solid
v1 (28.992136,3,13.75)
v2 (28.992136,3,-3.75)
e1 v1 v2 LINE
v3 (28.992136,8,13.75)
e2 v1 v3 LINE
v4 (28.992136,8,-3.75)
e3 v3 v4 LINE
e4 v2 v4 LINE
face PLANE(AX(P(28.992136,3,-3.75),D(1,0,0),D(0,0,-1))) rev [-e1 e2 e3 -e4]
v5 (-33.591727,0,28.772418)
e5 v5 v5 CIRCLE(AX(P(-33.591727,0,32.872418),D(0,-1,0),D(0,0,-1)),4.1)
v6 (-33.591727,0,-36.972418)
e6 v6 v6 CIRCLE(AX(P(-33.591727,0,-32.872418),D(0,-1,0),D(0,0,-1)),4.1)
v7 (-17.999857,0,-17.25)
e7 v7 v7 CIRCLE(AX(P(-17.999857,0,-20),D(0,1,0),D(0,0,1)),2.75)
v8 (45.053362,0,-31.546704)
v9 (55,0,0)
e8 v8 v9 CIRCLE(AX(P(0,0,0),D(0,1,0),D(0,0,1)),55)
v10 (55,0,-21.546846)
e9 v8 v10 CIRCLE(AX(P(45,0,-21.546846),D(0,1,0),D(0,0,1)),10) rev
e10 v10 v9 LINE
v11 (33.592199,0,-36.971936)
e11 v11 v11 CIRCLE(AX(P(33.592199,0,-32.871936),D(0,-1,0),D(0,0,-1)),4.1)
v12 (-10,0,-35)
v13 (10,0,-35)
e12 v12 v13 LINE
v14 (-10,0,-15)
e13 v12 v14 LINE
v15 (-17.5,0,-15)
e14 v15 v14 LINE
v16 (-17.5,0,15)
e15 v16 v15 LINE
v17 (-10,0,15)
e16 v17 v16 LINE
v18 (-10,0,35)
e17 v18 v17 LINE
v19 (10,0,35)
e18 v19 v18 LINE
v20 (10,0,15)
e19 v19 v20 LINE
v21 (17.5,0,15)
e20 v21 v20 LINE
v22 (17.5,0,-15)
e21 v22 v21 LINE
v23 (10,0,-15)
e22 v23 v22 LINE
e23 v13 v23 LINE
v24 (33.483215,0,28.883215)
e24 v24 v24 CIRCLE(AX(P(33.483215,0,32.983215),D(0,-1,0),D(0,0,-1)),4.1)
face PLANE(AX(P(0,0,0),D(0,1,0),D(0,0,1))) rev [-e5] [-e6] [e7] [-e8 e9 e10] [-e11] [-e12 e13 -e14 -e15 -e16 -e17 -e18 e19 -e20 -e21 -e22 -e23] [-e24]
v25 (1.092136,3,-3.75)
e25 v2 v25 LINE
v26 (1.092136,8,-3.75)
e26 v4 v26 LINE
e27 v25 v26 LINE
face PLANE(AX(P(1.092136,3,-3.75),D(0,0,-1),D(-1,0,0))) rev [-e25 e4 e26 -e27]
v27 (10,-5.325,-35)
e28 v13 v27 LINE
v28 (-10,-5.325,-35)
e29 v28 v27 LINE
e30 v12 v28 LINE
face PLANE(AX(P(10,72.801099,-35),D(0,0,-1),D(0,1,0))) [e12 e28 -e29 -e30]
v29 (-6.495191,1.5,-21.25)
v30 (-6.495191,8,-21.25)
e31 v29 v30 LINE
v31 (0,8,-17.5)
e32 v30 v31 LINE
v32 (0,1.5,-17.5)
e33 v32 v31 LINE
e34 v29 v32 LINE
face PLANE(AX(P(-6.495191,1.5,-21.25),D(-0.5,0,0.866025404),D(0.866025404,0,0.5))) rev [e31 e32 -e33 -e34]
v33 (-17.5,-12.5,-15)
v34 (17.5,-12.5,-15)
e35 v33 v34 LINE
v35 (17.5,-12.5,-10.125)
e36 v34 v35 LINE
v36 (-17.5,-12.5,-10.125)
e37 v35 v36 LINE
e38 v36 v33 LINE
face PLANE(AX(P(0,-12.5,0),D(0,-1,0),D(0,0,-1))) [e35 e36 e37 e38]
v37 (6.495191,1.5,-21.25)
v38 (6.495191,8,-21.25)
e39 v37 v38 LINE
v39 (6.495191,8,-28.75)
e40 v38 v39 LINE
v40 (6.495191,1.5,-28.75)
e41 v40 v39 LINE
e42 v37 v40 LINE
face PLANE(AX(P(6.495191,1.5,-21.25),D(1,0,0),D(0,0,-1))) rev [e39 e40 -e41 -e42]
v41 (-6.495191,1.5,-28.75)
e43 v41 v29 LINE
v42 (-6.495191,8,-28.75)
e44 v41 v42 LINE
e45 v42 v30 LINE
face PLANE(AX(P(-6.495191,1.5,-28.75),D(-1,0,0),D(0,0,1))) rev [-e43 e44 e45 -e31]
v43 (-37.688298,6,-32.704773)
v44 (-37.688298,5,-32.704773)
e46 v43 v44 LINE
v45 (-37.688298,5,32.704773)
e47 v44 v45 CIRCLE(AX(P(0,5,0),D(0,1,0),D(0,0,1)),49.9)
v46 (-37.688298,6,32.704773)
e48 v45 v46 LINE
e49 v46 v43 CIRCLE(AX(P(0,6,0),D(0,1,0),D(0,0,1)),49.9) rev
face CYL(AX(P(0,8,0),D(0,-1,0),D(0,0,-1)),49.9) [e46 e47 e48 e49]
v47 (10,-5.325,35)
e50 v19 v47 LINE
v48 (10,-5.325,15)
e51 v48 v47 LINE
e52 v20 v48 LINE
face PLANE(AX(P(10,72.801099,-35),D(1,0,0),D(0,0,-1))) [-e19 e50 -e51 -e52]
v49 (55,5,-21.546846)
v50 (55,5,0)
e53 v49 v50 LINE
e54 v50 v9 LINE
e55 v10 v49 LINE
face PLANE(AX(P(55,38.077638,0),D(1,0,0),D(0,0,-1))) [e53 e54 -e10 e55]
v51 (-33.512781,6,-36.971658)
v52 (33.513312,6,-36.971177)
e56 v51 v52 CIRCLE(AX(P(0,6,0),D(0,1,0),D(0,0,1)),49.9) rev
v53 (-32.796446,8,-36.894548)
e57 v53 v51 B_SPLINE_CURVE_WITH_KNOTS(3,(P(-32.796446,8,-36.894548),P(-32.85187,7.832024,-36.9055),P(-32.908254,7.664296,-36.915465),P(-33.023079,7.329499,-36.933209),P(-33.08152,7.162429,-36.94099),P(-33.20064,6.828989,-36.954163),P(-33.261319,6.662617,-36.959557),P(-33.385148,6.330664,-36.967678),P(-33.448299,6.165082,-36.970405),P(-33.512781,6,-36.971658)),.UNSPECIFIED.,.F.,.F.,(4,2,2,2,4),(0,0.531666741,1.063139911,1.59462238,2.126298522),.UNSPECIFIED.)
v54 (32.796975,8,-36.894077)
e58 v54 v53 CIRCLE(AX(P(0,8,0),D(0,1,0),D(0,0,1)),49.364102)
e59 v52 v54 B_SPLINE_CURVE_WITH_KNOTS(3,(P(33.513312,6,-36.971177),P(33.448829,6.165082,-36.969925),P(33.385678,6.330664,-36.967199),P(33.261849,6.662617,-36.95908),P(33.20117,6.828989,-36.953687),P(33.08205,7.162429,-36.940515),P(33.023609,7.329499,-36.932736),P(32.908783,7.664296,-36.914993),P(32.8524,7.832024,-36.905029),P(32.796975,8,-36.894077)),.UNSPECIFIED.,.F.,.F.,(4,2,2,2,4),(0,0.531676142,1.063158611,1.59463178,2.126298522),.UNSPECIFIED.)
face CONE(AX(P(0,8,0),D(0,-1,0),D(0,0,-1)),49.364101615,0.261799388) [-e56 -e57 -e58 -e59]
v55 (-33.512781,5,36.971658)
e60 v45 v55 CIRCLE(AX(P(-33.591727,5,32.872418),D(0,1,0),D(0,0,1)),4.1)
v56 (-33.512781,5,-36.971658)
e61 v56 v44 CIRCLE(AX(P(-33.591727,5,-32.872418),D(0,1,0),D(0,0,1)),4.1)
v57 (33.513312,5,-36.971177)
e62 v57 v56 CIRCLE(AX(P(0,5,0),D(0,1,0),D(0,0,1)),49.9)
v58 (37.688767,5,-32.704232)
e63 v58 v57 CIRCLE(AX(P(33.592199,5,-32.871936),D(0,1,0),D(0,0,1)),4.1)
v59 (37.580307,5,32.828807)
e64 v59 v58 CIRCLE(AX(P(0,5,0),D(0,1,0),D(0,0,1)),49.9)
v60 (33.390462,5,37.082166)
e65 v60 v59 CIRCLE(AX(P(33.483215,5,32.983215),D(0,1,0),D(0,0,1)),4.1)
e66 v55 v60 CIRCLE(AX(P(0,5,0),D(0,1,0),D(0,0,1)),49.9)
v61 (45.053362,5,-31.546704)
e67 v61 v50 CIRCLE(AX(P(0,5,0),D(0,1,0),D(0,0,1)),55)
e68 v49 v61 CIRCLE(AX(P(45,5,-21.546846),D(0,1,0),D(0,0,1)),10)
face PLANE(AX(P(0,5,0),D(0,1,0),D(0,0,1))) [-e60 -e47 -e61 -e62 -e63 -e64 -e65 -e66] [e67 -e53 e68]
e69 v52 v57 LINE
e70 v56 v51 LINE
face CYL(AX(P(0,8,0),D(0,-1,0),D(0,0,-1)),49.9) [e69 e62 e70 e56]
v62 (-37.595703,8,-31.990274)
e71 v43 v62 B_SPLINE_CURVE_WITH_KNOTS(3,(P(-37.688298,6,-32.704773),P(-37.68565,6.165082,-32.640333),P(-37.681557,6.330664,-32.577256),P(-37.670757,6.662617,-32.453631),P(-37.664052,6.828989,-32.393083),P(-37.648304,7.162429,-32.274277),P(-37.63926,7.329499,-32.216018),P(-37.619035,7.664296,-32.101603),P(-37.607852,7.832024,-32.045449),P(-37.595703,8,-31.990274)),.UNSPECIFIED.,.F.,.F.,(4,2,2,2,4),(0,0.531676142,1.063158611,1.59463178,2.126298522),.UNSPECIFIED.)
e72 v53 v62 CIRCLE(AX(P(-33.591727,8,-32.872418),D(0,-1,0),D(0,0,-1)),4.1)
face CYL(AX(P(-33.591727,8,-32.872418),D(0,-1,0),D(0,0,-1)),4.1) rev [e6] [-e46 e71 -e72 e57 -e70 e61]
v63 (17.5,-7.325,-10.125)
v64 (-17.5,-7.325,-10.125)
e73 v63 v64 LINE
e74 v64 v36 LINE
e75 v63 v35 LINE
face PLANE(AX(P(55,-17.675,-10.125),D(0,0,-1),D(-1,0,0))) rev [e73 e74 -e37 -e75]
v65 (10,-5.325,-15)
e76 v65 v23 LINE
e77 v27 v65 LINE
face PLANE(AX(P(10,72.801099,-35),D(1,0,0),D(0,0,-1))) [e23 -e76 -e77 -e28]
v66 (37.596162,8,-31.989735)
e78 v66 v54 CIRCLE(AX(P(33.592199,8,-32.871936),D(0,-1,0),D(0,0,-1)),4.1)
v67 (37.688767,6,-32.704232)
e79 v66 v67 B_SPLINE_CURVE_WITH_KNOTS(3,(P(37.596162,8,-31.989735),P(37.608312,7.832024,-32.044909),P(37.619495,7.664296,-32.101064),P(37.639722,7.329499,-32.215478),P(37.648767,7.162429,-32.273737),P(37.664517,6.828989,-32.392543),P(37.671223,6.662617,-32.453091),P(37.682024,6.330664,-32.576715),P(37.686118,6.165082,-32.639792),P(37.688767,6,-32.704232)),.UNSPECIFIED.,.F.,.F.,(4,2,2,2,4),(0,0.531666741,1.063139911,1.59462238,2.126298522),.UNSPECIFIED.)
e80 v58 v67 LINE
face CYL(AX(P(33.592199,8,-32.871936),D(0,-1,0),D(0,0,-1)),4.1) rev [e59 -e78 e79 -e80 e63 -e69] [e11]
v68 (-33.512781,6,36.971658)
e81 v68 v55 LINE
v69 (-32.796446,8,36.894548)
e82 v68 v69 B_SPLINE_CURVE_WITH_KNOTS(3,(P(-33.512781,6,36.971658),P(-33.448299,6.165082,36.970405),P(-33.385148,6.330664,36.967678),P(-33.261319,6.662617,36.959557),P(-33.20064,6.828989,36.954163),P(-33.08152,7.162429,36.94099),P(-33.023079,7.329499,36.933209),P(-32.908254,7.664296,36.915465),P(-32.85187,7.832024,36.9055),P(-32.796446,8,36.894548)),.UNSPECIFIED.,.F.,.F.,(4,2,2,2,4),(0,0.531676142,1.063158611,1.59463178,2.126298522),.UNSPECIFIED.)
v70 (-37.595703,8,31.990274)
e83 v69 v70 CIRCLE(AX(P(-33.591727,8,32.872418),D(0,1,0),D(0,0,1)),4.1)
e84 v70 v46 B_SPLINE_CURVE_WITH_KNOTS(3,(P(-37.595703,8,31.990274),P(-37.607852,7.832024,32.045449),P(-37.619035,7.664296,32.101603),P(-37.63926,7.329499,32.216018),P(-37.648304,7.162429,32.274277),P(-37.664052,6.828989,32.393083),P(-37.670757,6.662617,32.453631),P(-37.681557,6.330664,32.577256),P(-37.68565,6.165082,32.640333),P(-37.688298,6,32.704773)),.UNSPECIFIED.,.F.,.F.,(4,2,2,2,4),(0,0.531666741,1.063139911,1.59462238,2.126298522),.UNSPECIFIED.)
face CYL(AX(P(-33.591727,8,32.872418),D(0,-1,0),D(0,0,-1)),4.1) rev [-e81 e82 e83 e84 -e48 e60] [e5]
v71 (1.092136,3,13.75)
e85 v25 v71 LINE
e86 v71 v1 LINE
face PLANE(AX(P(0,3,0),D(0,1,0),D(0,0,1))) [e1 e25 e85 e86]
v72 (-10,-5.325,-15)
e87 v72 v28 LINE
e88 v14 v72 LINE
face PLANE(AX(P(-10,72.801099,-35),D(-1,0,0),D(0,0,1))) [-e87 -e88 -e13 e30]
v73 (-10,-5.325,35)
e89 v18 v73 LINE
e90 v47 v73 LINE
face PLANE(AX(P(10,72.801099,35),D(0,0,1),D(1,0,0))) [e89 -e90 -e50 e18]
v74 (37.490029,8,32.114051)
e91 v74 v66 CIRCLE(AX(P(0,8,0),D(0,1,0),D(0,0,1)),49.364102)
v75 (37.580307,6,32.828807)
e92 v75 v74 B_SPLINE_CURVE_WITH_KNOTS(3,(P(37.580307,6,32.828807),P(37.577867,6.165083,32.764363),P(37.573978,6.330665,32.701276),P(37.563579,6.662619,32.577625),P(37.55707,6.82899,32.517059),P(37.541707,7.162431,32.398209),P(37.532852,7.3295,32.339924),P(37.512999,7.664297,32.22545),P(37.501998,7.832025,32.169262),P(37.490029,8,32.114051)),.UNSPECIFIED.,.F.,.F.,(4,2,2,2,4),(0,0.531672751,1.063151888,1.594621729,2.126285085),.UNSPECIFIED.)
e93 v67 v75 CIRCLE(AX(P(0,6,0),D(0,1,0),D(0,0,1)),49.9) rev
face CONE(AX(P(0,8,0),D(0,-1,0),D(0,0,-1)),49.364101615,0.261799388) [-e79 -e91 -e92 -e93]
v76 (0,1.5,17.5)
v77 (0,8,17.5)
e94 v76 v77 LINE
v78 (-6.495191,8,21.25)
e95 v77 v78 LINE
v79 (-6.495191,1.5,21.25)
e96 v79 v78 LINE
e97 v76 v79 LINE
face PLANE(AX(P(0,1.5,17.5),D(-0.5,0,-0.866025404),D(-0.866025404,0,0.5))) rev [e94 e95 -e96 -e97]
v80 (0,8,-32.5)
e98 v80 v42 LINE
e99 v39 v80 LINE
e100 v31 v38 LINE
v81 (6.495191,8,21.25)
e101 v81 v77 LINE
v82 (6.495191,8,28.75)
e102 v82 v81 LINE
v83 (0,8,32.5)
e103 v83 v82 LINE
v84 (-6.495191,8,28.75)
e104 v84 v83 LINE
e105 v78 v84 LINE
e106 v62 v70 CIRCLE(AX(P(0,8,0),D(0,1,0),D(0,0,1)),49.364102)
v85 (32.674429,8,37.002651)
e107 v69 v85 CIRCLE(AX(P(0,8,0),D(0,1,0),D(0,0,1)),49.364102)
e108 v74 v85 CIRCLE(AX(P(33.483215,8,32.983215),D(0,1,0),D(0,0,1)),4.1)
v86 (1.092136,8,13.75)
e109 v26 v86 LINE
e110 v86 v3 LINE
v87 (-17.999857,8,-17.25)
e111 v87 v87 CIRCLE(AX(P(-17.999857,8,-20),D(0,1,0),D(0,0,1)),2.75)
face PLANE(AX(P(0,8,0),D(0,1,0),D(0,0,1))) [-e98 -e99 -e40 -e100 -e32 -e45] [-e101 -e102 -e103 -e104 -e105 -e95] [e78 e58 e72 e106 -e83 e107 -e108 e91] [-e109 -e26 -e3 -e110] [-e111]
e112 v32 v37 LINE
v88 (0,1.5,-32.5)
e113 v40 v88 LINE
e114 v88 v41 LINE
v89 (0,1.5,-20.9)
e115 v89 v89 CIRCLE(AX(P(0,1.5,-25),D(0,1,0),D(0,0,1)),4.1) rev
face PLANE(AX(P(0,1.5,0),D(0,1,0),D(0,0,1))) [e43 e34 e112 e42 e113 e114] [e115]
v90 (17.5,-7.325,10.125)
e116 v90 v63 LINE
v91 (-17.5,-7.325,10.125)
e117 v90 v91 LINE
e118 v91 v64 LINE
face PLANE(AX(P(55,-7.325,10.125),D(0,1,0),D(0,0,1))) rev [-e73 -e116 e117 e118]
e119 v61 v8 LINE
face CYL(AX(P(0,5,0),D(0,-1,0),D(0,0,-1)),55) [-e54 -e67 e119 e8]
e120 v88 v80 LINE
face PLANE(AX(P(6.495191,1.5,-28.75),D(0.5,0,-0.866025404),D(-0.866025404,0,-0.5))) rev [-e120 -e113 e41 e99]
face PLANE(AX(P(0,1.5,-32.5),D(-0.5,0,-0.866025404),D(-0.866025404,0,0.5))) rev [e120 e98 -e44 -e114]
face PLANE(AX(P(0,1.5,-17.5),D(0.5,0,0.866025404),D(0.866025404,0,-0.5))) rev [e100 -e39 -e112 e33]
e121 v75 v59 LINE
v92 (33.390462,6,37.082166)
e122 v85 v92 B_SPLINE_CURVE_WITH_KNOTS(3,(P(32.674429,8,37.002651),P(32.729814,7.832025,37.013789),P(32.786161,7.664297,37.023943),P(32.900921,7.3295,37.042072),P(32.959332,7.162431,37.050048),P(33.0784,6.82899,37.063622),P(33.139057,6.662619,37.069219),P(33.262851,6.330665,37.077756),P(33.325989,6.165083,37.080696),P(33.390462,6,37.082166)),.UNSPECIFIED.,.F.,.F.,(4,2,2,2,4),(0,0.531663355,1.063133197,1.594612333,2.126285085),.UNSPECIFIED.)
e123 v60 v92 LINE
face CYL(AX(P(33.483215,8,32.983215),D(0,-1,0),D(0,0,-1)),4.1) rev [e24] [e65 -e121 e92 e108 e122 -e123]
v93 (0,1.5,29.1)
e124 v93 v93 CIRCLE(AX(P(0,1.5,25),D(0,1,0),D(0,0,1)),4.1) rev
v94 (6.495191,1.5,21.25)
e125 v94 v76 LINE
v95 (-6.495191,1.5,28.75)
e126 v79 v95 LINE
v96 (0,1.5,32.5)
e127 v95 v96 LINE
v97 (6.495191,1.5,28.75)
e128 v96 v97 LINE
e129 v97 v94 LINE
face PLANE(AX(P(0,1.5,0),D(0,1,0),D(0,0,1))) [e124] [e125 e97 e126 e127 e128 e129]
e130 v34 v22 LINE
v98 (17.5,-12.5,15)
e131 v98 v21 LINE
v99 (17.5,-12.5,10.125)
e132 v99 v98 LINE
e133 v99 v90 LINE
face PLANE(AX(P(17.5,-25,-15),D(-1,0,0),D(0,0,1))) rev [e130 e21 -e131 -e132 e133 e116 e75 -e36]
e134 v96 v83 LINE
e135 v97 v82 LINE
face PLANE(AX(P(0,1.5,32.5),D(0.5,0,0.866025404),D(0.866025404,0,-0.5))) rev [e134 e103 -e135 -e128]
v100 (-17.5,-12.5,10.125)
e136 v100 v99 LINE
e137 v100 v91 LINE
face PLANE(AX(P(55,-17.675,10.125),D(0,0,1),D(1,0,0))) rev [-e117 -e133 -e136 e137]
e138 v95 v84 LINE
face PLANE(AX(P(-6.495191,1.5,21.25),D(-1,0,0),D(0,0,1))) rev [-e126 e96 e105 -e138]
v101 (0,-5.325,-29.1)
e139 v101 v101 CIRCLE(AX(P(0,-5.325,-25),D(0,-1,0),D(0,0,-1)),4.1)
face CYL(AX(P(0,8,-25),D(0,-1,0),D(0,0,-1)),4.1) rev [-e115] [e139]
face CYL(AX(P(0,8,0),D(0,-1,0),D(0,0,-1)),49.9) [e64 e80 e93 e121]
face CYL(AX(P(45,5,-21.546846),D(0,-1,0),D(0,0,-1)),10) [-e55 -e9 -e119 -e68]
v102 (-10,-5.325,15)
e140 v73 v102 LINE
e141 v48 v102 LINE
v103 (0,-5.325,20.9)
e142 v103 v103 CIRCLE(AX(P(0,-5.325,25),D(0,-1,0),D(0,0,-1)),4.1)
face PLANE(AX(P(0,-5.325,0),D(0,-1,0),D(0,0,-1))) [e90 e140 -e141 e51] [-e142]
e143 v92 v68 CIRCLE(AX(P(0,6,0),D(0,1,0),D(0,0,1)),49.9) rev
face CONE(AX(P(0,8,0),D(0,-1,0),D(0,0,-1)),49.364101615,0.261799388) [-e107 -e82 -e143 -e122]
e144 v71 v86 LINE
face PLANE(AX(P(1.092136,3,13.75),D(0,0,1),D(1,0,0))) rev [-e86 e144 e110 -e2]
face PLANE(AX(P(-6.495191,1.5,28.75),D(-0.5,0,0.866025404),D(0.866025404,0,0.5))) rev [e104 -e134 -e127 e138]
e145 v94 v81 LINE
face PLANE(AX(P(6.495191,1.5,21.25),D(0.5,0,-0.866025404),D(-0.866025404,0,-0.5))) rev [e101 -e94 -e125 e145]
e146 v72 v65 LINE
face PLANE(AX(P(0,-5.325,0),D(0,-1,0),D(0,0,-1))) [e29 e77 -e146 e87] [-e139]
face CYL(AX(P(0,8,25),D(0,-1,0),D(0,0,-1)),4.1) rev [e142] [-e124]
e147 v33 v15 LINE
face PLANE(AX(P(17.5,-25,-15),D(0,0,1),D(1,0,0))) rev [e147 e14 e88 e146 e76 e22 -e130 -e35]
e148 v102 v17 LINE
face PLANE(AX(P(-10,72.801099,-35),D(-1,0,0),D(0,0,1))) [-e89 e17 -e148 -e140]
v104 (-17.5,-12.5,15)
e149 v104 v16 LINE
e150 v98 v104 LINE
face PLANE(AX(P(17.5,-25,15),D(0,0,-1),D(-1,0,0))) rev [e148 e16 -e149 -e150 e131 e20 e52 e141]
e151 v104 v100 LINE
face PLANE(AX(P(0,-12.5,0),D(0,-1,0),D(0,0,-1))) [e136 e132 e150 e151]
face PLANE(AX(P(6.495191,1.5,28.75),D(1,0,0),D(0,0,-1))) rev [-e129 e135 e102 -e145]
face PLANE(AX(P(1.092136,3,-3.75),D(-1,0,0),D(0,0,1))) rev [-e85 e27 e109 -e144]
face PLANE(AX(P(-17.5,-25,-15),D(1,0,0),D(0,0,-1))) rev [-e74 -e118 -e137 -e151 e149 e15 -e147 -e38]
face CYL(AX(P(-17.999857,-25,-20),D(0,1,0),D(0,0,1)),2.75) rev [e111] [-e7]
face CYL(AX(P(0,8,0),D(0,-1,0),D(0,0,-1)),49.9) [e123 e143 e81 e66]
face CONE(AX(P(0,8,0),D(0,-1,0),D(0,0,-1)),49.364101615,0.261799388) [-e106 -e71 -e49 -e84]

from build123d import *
from OCP.BRepFilletAPI import BRepFilletAPI_MakeChamfer

# Parameters (mm, degrees)
SKETCH_1_R          = 55
EXTRUDE_1_DEPTH     = 5
SKETCH_2_R          = 49.9
EXTRUDE_2_DEPTH     = 3
SKETCH_3_W          = 35
SKETCH_3_H          = 30
EXTRUDE_3_DEPTH     = 25
SKETCH_5_R          = 4.1
CUT_EXTRUDE_2_DEPTH = 82.700673192
SKETCH_6_R          = 2.75
CUT_EXTRUDE_3_DEPTH = 85.492603227
BOSS_EXTRUDE1_DEPTH = 5
FILLET1_R           = 10
SKETCH2_W           = 20.25
SKETCH2_H           = 10.35
CUT_EXTRUDE1_DEPTH  = 95.372930441
SKETCH3_W           = 27.9
SKETCH3_H           = 17.5
CUT_EXTRUDE2_DEPTH  = 5
CHAMFER1_SIZE       = 2
CHAMFER1_SIZE2      = 0.535898385
SKETCH4_W           = 35
SKETCH4_H           = 30
CUT_EXTRUDE3_DEPTH  = 12.5
BOSS_EXTRUDE2_START = -2
SKETCH5_W           = 20
SKETCH5_H           = 70
BOSS_EXTRUDE2_DEPTH = 5.325
SKETCH6_R           = 4.1
CUT_EXTRUDE4_DEPTH  = 79.914863161
CUT_EXTRUDE5_DEPTH  = 6.5


with BuildPart() as part:
    # Эскиз1 → Бобышка-Вытянуть1 (new body)
    with BuildSketch(Plane(origin=(0, 0, 0), x_dir=(1, 0, 0), z_dir=(0, 1, 0))):
        with Locations(Location((0, 0, 0), (0, 0, 270))):
            Circle(SKETCH_1_R)
    extrude(amount=EXTRUDE_1_DEPTH)

    # Эскиз2 → Бобышка-Вытянуть2 (add)
    with BuildSketch(Plane(origin=(0, 5, 0), x_dir=(1, 0, 0), z_dir=(0, 1, 0))):
        with Locations(Location((0, 0, 0), (0, 0, 270))):
            Circle(SKETCH_2_R)
    extrude(amount=EXTRUDE_2_DEPTH)

    # Эскиз3 → Бобышка-Вытянуть3 (add)
    with BuildSketch(Plane.XZ):
        Rectangle(SKETCH_3_W, SKETCH_3_H)
    extrude(amount=EXTRUDE_3_DEPTH)

    # Эскиз5 → Вырез-Вытянуть2 (cut, through all)
    with BuildSketch(Plane.XZ):
        with Locations(Location((33.592198598, -32.871936263, 0), (0, 0, 270))):
            Circle(SKETCH_5_R)
        with Locations(Location((-33.591727056, -32.872418125, 0), (0, 0, 270))):
            Circle(SKETCH_5_R)
        with Locations(Location((-33.591727056, 32.872418125, 0), (0, 0, 270))):
            Circle(SKETCH_5_R)
        with Locations(Location((33.483215177, 32.983215177, 0), (0, 0, 270))):
            Circle(SKETCH_5_R)
    extrude(amount=-CUT_EXTRUDE_2_DEPTH, mode=Mode.SUBTRACT)

    # Эскиз6 → Вырез-Вытянуть3 (cut, through all)
    with BuildSketch(Plane(origin=(0, 8, 0), x_dir=(1, 0, 0), z_dir=(0, 1, 0))):
        with Locations(Location((-17.999856554, 19.999999999, 0), (0, 0, 270))):
            Circle(SKETCH_6_R)
    extrude(amount=-CUT_EXTRUDE_3_DEPTH, mode=Mode.SUBTRACT)

    # Sketch1 → Boss-Extrude1 (add)
    with BuildSketch(Plane.XZ):
        with BuildLine():
            Line((55, 0), (55, -31.546703999))
            Line((55, -31.546703999), (45.053362436, -31.546703999))
            ThreePointArc((45.053362436, -31.546703999), (52.454432291, -16.538818973), (55, 0))
        make_face()
    extrude(amount=-BOSS_EXTRUDE1_DEPTH)

    # Fillet1
    # the kernel refuses this fillet: 10 mm, written as the material it takes off along each edge
    with BuildSketch(Plane(origin=(55, -25, -31.546703999), x_dir=(0, 0, 1), z_dir=(0, 1, 0))) as fillet1_piece_1_section:
        with BuildLine():
            CenterArc((FILLET1_R, -FILLET1_R), FILLET1_R, 90, 90)
            Line((0, -FILLET1_R), (0, 0))
            Line((0, 0), (FILLET1_R, 0))
        make_face()
    fillet1_piece_1 = extrude(amount=55, mode=Mode.PRIVATE)
    fillet1_piece_1 = fillet1_piece_1 - Plane(origin=(0, 2.5, 0), x_dir=(0, 0, 1), z_dir=(0, -1, 0)) * Cylinder(55, 150, mode=Mode.PRIVATE)
    add(fillet1_piece_1, mode=Mode.SUBTRACT)

    # Sketch2 → Cut-Extrude1 (cut, through all)
    with BuildSketch(Plane.ZY.offset(17.5)):
        with Locations((0, -12.5)):
            Rectangle(SKETCH2_W, SKETCH2_H)
    extrude(amount=-CUT_EXTRUDE1_DEPTH, mode=Mode.SUBTRACT)

    # Sketch3 → Cut-Extrude2 (cut)
    with BuildSketch(Plane(origin=(0, 8, 0), x_dir=(1, 0, 0), z_dir=(0, 1, 0))):
        with Locations((15.042136476, -5)):
            Rectangle(SKETCH3_W, SKETCH3_H)
    extrude(amount=-CUT_EXTRUDE2_DEPTH, mode=Mode.SUBTRACT)

    # Chamfer1: one chamfer whose edges measure the first distance from different faces: ONE call of the kernel's chamfer builder (chamfer() names one face for all edges)
    chamfer1_edges_1 = [part.edges().sort_by_distance(p)[0] for p in [
        (0.000357897, 8, -49.899999999),
    ]]
    chamfer1_side_1 = [part.faces().sort_by_distance(p)[0] for p in [
        (0.000357897, 6.5, -49.899999999),
    ]]
    chamfer1_edges_2 = [part.edges().sort_by_distance(p)[0] for p in [
        (-49.9, 8, 0),
    ]]
    chamfer1_side_2 = [part.faces().sort_by_distance(p)[0] for p in [
        (-49.9, 6.5, 0),
    ]]
    chamfer1_edges_3 = [part.edges().sort_by_distance(p)[0] for p in [
        (-0.08242255, 8, 49.899931929),
    ]]
    chamfer1_side_3 = [part.faces().sort_by_distance(p)[0] for p in [
        (-0.08242255, 6.5, 49.899931929),
    ]]
    chamfer1_edges_4 = [part.edges().sort_by_distance(p)[0] for p in [
        (49.899931657, 8, 0.082587101),
    ]]
    chamfer1_side_4 = [part.faces().sort_by_distance(p)[0] for p in [
        (49.899931657, 6.5, 0.082587101),
    ]]
    chamfer1 = BRepFilletAPI_MakeChamfer(part.part.solid().wrapped)
    for e in chamfer1_edges_1:
        chamfer1.Add(CHAMFER1_SIZE, CHAMFER1_SIZE2, e.wrapped, chamfer1_side_1[0].wrapped)  # the first distance lies on this face
    for e in chamfer1_edges_2:
        chamfer1.Add(CHAMFER1_SIZE, CHAMFER1_SIZE2, e.wrapped, chamfer1_side_2[0].wrapped)  # the first distance lies on this face
    for e in chamfer1_edges_3:
        chamfer1.Add(CHAMFER1_SIZE, CHAMFER1_SIZE2, e.wrapped, chamfer1_side_3[0].wrapped)  # the first distance lies on this face
    for e in chamfer1_edges_4:
        chamfer1.Add(CHAMFER1_SIZE, CHAMFER1_SIZE2, e.wrapped, chamfer1_side_4[0].wrapped)  # the first distance lies on this face
    add(Compound.cast(chamfer1.Shape()), mode=Mode.REPLACE)

    # Sketch4 → Cut-Extrude3 (cut)
    with BuildSketch(Plane.XZ.offset(25)):
        Rectangle(SKETCH4_W, SKETCH4_H)
    extrude(amount=-CUT_EXTRUDE3_DEPTH, mode=Mode.SUBTRACT)

    # Sketch5 → Boss-Extrude2 (add)
    with BuildSketch(Plane.XZ.offset(7.325).offset(BOSS_EXTRUDE2_START)):
        Rectangle(SKETCH5_W, SKETCH5_H)
    extrude(amount=-BOSS_EXTRUDE2_DEPTH)

    # Sketch6 → Cut-Extrude4 (cut, through all)
    with BuildSketch(Plane.XZ.offset(5.325)):
        with Locations(Location((0, 25, 0), (0, 0, 270))):
            Circle(SKETCH6_R)
        with Locations(Location((0, -25, 0), (0, 0, 270))):
            Circle(SKETCH6_R)
    extrude(amount=-CUT_EXTRUDE4_DEPTH, mode=Mode.SUBTRACT)

    # Sketch7 → Cut-Extrude5 (cut)
    with BuildSketch(Plane(origin=(0, 8, 0), x_dir=(1, 0, 0), z_dir=(0, 1, 0))):
        Polygon((0, -32.5), (6.495190528, -28.75), (6.495190528, -21.25), (0, -17.5), (-6.495190528, -21.25), (-6.495190528, -28.75), align=None)
        Polygon((0, 17.5), (6.495190528, 21.25), (6.495190528, 28.75), (0, 32.5), (-6.495190528, 28.75), (-6.495190528, 21.25), align=None)
    extrude(amount=-CUT_EXTRUDE5_DEPTH, mode=Mode.SUBTRACT)


solid = part.part
